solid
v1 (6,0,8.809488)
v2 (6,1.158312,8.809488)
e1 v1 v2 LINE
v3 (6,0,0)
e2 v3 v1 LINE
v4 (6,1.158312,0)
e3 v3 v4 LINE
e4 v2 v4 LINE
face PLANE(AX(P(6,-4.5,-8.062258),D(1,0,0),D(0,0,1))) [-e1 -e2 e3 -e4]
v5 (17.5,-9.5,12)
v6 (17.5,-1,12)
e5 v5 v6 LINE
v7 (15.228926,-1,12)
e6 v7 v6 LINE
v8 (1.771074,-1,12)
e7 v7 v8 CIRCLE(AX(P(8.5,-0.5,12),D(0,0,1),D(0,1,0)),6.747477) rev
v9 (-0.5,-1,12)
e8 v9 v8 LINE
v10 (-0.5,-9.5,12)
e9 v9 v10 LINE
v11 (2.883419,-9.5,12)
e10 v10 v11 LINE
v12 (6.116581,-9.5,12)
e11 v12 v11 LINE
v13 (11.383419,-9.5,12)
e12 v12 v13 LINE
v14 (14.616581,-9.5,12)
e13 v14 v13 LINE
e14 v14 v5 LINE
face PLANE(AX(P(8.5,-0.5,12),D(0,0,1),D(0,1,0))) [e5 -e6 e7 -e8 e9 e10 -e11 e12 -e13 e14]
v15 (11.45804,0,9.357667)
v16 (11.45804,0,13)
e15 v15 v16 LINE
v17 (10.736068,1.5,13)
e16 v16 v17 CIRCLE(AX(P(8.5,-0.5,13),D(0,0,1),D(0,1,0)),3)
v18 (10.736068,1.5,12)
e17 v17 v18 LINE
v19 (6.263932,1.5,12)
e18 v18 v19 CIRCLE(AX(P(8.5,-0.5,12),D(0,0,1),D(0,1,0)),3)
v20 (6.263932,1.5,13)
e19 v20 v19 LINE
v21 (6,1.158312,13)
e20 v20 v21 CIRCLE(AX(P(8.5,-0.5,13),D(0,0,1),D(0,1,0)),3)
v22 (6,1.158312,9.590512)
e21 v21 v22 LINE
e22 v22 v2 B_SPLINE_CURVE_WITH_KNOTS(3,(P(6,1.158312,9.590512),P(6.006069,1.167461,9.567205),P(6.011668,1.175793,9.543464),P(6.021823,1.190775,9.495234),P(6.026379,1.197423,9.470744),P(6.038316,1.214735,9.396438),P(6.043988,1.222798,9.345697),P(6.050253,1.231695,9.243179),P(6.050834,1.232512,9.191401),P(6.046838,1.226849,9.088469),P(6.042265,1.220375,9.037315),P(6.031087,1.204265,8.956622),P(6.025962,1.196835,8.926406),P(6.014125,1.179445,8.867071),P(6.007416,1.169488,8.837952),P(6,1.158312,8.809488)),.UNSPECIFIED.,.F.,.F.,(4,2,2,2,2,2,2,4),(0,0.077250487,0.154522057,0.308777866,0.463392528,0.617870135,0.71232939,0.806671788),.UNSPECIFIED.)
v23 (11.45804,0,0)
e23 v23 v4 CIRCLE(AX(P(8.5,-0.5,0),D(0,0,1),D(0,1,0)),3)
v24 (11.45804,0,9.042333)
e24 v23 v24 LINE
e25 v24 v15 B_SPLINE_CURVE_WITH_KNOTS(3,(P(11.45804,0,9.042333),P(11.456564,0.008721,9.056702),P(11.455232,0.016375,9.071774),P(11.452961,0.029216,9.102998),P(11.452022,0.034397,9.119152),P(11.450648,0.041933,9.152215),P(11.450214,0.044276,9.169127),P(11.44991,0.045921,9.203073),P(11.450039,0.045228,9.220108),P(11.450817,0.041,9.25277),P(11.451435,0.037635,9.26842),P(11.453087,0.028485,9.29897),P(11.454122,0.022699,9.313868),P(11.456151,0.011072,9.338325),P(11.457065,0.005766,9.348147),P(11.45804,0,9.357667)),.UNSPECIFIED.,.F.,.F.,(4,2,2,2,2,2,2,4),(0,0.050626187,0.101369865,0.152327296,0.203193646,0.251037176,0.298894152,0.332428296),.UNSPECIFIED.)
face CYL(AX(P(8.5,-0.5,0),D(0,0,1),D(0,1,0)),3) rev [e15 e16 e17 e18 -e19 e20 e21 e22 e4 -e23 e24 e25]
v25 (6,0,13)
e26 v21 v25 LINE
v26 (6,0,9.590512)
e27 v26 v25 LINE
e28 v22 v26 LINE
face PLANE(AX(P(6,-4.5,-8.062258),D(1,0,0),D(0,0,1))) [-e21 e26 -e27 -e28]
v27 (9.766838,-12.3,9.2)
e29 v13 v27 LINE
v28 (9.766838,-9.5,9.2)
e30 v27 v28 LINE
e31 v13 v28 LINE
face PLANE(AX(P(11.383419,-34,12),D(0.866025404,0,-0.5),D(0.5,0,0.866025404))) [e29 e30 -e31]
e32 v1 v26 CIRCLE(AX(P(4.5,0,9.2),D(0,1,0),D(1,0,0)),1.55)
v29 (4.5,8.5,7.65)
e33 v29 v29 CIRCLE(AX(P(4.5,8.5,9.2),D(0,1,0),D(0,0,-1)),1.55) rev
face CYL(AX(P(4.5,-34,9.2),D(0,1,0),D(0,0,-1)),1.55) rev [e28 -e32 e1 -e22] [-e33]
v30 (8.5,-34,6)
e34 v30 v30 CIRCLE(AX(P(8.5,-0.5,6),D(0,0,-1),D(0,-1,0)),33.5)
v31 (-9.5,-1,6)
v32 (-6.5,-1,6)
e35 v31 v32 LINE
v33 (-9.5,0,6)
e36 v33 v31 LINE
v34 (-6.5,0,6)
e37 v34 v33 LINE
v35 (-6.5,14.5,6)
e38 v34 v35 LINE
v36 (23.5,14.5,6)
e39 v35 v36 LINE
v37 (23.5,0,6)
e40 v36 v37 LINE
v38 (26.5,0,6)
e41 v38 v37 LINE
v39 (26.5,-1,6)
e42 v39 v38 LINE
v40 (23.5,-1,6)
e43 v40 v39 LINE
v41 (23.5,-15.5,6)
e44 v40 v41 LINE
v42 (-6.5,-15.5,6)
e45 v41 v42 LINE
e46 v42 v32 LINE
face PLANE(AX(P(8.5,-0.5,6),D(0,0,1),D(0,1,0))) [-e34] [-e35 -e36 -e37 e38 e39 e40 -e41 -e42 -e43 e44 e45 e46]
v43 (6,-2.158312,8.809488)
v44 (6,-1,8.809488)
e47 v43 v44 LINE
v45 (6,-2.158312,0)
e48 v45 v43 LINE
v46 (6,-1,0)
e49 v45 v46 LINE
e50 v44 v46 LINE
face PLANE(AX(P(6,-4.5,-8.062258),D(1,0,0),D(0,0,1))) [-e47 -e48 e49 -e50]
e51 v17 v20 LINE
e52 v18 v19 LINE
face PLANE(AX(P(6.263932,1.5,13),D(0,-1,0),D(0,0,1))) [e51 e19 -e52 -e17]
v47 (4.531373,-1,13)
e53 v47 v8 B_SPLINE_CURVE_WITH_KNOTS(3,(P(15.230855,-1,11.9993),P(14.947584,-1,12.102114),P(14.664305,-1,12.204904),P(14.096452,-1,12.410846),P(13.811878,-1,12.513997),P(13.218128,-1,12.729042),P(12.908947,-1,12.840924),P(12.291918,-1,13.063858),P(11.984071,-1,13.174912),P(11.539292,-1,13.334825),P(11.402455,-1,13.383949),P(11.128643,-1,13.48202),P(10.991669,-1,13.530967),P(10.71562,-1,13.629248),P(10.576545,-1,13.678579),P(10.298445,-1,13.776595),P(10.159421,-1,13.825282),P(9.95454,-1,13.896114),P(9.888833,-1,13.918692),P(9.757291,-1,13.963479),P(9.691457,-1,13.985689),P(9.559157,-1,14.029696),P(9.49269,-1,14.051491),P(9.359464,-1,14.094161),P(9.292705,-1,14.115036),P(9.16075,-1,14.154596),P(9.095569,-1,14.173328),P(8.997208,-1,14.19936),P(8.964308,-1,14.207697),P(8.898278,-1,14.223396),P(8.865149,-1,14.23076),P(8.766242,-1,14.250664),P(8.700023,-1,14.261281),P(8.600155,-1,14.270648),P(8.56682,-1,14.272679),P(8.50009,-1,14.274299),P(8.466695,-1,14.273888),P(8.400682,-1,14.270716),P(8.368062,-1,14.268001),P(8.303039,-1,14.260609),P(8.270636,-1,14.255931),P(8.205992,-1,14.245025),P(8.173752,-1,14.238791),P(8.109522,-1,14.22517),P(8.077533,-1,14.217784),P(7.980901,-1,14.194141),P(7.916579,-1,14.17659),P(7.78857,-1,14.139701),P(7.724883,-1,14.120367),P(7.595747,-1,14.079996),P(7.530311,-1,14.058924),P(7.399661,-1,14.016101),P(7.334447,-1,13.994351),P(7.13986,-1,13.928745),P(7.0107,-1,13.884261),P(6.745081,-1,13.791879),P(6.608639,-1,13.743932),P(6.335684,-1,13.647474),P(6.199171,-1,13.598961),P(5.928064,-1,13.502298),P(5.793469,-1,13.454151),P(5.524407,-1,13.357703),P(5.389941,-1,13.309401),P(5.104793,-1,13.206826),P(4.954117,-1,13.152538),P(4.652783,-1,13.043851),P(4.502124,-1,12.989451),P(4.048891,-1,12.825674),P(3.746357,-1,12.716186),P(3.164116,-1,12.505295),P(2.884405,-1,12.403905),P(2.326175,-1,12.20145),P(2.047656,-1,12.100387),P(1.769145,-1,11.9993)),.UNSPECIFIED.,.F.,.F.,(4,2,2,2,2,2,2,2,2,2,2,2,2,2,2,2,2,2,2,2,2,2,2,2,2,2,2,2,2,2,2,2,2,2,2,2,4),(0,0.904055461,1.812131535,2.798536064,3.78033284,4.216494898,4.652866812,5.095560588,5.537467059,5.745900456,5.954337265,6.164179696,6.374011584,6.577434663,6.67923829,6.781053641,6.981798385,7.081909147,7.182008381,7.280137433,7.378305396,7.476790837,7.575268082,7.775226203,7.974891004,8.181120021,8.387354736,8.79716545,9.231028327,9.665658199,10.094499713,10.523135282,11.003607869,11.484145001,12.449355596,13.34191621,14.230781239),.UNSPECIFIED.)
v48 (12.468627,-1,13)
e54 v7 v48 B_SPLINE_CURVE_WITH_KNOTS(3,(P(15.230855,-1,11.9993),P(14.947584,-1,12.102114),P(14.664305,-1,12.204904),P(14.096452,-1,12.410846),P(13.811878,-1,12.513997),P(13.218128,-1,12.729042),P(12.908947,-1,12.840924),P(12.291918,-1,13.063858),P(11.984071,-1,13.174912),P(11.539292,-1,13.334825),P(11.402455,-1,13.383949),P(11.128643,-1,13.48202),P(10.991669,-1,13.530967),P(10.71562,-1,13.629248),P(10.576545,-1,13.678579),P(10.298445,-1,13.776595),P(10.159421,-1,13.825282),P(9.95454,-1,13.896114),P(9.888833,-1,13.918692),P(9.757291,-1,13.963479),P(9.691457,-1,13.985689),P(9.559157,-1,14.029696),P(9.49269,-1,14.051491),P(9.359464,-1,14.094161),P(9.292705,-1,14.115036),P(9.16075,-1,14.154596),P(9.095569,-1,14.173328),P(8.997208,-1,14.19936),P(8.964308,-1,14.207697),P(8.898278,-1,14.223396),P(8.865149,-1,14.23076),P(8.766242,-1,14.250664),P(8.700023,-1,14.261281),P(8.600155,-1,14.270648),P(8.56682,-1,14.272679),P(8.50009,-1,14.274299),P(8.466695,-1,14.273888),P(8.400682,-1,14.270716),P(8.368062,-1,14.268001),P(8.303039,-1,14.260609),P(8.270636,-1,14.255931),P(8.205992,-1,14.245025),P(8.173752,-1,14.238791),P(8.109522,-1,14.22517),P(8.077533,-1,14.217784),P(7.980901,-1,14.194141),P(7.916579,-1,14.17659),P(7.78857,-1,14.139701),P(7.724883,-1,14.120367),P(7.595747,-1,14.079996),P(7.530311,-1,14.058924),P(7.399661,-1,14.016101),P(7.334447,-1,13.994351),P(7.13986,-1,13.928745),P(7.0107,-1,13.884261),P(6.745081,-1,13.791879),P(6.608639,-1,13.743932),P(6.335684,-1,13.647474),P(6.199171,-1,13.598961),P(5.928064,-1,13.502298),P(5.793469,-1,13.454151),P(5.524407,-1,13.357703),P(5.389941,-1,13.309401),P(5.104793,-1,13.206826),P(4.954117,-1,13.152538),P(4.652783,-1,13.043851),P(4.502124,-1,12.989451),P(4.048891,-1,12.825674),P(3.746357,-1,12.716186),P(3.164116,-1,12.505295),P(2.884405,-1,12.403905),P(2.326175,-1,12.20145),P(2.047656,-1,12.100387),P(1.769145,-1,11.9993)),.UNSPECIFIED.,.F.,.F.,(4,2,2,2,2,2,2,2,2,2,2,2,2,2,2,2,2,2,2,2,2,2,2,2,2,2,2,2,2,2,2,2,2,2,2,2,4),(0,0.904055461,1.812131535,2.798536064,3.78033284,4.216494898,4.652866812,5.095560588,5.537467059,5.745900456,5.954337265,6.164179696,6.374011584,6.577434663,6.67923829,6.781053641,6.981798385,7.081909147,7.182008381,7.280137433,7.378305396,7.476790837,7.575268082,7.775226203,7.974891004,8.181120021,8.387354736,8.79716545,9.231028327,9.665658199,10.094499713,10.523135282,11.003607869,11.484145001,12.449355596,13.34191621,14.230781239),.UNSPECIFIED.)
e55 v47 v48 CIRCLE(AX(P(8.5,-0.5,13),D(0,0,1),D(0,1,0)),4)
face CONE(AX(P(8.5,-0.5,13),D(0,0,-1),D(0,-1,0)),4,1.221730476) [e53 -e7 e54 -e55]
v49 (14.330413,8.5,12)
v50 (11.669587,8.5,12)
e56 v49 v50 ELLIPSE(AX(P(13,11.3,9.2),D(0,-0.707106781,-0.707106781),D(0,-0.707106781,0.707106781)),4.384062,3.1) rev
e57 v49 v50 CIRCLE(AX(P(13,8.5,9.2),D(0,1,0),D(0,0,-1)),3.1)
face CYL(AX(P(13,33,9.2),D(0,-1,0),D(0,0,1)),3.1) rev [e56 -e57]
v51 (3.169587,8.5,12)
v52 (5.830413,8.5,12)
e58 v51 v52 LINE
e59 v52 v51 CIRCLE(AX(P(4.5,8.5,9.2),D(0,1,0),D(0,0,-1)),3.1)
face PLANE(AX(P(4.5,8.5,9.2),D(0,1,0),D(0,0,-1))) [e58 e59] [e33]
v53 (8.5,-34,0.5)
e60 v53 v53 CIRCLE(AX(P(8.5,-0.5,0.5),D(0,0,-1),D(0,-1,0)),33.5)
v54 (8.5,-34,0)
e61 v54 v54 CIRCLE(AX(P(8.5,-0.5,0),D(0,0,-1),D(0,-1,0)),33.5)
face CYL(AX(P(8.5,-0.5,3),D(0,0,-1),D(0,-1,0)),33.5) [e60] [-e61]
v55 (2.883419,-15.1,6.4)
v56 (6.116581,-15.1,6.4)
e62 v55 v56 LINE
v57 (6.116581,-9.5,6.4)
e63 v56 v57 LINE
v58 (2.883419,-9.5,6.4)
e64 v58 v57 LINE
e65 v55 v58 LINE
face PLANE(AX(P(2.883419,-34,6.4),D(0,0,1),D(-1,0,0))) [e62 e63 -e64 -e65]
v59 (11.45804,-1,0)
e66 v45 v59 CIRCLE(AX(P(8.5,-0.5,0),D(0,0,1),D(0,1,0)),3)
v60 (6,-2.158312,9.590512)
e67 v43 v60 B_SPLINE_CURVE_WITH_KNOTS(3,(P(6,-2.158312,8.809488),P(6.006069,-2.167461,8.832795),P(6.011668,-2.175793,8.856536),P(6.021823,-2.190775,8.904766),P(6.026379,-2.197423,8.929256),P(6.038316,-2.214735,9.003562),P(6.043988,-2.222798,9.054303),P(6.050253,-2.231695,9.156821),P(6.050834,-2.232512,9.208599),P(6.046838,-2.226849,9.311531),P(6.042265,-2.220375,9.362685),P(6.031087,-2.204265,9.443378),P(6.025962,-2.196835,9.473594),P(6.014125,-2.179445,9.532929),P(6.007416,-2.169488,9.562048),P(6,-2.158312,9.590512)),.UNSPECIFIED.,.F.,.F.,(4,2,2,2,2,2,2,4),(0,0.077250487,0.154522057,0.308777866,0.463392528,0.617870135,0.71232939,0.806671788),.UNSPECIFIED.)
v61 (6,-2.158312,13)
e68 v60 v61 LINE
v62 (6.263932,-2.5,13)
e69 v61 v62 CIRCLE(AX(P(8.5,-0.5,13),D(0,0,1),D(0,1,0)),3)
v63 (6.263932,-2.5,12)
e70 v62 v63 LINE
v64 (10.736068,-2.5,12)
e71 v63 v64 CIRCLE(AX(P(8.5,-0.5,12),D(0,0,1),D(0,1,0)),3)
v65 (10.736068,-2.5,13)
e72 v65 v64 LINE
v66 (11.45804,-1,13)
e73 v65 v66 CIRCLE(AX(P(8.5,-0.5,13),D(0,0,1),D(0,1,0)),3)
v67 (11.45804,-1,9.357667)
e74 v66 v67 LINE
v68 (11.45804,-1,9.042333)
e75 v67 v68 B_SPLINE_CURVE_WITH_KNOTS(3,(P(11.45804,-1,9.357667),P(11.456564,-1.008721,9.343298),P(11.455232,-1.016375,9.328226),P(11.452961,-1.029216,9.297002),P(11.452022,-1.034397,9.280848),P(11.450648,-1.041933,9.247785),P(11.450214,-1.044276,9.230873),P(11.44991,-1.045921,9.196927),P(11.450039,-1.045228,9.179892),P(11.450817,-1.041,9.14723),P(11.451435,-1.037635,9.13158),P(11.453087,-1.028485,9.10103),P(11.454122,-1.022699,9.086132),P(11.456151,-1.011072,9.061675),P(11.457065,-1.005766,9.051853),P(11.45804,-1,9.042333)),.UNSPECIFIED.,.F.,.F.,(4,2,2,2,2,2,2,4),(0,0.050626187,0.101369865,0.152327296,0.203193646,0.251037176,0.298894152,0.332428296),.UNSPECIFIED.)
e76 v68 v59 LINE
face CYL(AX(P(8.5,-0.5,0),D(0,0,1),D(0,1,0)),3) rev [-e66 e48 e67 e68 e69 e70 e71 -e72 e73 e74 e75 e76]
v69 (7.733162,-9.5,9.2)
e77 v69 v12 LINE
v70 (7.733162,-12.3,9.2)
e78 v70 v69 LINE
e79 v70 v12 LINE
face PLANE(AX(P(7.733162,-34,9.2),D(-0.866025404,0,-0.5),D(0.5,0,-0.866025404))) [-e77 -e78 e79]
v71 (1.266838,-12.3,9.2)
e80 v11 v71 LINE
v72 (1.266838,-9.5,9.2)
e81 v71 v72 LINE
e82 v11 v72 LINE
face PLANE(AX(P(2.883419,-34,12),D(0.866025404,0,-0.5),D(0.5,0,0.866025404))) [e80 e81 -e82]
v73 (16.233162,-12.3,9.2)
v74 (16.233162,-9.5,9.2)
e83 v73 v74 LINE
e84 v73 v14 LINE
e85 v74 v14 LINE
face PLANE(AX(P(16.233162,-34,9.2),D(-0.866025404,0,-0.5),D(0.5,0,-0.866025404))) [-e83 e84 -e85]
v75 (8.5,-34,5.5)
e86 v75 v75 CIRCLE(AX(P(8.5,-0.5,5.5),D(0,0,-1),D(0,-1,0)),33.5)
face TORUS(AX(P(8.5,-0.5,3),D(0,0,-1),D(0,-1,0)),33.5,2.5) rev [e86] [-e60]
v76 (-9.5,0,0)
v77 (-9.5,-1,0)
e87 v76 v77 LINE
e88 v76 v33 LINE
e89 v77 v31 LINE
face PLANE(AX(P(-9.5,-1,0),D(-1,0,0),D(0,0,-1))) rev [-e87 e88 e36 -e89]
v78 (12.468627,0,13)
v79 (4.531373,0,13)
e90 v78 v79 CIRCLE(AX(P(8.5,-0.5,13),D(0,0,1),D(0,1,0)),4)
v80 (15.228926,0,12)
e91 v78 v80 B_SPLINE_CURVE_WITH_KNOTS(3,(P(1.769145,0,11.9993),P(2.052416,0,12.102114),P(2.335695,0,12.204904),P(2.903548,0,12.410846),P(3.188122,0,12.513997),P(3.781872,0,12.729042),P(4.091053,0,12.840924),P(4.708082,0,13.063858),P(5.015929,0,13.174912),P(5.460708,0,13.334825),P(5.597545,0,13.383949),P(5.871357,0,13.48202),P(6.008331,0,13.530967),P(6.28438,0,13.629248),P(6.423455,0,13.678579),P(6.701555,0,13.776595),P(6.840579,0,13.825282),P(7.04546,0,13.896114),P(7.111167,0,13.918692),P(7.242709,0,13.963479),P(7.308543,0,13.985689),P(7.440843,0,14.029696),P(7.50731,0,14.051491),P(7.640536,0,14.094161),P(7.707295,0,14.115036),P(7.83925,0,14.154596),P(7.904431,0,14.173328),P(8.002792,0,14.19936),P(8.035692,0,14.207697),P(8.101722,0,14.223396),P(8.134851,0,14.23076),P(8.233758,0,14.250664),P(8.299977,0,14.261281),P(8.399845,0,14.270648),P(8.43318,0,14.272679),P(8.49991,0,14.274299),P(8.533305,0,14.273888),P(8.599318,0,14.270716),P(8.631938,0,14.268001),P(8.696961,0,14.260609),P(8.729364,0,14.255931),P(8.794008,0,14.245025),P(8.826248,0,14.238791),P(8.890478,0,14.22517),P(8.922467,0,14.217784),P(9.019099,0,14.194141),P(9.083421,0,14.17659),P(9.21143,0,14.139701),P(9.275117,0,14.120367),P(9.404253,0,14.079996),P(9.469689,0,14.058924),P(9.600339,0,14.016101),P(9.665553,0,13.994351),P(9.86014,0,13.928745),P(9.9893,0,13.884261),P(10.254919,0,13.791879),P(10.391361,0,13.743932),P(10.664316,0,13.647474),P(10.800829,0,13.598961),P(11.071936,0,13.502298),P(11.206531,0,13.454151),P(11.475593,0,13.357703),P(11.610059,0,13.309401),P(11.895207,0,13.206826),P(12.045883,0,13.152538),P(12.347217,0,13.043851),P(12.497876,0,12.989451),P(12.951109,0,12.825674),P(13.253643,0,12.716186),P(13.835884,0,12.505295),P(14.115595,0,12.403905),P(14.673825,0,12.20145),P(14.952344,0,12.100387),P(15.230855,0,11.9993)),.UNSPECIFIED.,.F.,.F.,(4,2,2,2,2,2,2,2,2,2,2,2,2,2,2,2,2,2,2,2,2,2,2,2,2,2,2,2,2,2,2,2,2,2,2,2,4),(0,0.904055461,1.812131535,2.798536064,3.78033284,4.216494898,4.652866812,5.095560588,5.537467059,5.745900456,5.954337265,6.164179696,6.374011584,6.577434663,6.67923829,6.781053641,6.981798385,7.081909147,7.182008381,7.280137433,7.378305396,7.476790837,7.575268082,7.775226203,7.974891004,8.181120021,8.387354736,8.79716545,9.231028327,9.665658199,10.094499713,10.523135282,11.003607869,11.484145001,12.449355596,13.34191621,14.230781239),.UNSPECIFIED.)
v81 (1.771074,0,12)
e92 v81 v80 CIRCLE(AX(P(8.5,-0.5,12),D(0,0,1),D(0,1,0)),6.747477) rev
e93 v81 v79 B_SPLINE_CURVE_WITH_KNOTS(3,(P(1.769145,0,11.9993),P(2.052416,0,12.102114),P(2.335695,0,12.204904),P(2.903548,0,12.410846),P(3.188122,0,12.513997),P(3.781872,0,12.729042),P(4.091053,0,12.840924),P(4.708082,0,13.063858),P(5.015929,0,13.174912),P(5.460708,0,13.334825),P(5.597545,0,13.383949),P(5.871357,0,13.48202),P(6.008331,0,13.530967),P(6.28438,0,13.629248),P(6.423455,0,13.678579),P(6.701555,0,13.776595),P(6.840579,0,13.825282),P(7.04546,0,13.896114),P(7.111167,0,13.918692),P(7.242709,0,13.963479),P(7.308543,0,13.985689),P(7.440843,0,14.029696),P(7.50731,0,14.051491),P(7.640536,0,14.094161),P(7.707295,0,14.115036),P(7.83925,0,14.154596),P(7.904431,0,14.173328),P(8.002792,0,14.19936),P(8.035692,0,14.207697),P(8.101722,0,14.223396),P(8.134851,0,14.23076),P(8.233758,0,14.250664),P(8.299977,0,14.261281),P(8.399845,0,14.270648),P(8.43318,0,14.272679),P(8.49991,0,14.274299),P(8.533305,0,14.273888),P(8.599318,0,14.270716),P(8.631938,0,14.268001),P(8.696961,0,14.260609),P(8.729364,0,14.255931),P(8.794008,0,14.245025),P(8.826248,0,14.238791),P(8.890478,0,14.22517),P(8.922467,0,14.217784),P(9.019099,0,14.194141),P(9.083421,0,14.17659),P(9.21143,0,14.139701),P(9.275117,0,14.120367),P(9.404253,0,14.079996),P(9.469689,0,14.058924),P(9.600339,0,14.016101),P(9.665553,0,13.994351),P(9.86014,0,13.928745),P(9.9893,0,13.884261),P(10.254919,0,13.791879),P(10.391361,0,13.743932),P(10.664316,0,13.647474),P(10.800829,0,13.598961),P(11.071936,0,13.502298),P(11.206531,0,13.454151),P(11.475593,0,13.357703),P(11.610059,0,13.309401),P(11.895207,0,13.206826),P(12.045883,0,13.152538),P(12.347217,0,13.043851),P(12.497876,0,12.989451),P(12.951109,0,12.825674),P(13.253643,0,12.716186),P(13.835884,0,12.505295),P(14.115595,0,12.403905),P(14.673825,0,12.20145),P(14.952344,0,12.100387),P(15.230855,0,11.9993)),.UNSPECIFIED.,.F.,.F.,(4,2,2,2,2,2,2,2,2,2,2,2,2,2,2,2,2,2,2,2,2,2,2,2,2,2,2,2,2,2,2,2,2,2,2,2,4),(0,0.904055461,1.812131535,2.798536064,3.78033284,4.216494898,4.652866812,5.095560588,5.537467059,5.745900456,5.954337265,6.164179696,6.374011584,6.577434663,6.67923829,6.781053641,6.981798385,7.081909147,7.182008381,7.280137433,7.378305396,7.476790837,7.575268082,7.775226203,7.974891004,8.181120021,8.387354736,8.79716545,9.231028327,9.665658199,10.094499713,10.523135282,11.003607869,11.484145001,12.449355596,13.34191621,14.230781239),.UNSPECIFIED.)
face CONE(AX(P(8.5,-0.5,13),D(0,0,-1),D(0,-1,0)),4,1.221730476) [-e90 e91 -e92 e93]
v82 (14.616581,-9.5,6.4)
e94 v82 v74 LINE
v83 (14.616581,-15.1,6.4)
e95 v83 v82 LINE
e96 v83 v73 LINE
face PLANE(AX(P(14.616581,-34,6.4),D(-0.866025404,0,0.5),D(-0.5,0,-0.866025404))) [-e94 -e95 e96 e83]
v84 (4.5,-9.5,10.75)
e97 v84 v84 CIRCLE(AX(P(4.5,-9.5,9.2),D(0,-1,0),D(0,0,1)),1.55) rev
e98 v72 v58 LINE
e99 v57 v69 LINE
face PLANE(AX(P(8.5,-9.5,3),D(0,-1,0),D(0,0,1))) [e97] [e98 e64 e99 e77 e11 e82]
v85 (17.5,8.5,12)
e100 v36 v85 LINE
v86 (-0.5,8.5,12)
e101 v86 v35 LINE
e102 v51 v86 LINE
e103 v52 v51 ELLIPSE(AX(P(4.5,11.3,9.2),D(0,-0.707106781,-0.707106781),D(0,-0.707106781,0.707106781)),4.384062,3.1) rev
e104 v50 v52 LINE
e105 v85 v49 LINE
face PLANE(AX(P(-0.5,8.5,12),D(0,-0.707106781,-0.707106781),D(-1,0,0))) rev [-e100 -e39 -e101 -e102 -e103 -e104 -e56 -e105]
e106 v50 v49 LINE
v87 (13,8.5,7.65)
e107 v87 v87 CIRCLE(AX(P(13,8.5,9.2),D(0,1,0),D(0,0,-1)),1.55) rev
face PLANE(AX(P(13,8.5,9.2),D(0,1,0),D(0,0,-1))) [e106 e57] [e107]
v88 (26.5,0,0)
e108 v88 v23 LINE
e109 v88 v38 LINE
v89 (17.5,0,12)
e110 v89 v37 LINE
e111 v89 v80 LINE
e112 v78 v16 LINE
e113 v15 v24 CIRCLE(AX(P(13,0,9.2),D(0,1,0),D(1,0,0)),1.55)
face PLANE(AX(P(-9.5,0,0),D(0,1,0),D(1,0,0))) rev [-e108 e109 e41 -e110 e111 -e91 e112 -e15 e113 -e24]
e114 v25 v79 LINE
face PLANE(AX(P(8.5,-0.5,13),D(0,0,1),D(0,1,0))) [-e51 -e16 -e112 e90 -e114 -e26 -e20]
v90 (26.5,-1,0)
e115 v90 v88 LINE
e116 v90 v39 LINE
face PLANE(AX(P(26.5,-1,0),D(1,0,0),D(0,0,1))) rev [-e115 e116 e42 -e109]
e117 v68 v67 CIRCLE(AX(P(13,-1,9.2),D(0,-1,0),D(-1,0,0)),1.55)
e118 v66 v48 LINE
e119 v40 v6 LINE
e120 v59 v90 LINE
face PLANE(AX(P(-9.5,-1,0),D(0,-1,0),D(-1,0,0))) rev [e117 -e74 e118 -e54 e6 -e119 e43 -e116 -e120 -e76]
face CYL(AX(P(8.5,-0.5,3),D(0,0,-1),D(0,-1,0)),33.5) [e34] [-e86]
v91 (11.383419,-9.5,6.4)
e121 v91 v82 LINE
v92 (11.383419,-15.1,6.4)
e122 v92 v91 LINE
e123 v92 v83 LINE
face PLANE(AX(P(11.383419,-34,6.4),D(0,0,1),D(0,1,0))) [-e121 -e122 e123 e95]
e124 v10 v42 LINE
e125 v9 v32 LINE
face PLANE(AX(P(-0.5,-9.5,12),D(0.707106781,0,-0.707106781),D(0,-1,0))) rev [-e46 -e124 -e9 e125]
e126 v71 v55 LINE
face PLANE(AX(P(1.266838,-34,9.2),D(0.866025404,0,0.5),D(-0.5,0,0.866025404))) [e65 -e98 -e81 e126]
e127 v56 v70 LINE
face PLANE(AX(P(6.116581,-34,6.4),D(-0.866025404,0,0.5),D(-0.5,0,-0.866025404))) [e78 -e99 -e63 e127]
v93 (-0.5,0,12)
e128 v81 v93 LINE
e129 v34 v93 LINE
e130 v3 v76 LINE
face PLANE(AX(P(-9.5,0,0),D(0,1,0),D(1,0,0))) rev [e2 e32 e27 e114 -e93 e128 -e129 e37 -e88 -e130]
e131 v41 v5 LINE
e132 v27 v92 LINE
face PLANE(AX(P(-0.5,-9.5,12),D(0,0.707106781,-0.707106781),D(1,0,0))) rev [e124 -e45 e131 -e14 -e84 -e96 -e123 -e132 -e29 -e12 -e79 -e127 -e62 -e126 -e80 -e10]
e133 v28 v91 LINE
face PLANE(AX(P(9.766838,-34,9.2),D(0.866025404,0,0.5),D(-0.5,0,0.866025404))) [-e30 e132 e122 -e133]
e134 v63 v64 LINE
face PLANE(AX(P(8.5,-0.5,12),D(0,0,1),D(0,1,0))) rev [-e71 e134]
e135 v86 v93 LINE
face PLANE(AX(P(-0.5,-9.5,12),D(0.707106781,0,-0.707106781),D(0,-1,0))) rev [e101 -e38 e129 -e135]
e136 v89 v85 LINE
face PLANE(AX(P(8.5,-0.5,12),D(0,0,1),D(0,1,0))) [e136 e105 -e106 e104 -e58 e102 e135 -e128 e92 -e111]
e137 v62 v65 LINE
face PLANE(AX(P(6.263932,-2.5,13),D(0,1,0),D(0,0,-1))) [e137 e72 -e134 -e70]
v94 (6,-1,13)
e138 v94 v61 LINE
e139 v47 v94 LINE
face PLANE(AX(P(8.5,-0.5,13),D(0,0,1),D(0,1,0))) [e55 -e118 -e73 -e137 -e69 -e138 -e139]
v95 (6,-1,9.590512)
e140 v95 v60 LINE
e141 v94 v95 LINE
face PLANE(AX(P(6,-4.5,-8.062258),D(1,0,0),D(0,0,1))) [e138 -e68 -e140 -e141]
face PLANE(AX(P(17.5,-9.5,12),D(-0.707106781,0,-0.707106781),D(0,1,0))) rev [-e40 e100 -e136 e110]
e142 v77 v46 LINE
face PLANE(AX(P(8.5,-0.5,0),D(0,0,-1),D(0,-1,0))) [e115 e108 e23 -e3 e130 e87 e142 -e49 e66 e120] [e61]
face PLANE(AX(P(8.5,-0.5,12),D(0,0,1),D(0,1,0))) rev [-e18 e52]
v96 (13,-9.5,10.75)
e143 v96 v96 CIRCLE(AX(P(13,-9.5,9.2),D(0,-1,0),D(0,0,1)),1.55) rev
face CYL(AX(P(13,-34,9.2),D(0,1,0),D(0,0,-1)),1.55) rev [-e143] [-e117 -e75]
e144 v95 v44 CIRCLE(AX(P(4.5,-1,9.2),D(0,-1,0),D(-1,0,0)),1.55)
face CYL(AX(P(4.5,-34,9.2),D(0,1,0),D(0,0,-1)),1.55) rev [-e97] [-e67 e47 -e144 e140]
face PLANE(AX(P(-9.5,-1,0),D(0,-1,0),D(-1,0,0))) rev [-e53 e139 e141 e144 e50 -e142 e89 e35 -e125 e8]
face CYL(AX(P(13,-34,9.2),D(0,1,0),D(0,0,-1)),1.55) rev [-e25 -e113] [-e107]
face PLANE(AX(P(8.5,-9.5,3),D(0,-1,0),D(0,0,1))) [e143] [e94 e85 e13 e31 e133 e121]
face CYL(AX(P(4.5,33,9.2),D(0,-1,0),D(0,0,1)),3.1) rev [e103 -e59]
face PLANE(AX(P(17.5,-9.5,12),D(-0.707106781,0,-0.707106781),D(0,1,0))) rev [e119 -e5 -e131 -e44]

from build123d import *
from build123d.topology import SkipClean

# Parameters (mm, degrees)
SKETCH3_R               = 3
CUT_EXTRUDE1_DEPTH      = 48.754580932
SKETCH4_W               = 8
SKETCH4_H               = 1
BOSS_EXTRUDE1_DEPTH     = 6
BOSS_EXTRUDE2_START     = 6
SKETCH5_W               = 18
SKETCH5_H               = 18
BOSS_EXTRUDE2_DEPTH     = 6
BOSS_EXTRUDE3_START     = 1
SKETCH13_R              = 4
BOSS_EXTRUDE3_DEPTH     = 1
CHAMFER1_SIZE           = 6
CHAMFER2_SIZE2          = 1
CHAMFER2_SIZE           = 2.747477419
CUT_EXTRUDE2_DEPTH      = 49.872282533
CUT_EXTRUDE2_DEPTH_BACK = 49.872282533
SKETCH6_W               = 1
SKETCH6_H               = 36
CUT_EXTRUDE5_DEPTH      = 49.420037175
CUT_EXTRUDE5_DEPTH_BACK = 49.420037175
SKETCH7_R               = 1.55
CUT_EXTRUDE6_START      = 9
CUT_EXTRUDE6_DEPTH      = 40.420037195
CUT_EXTRUDE7_START      = 9
SKETCH9_R               = 3.1
CUT_EXTRUDE7_DEPTH      = 40.420037195
SKETCH11_R              = 2.5
BODY_MOVE_COPY1_ANGLE   = 180


with BuildPart() as part:
    # Sketch2 → Revolve1 (revolve)
    with BuildSketch(Plane(origin=(0, 0, 0), x_dir=(1, 0, 0), z_dir=(0, 1, 0))):
        with BuildLine():
            Line((0, 0), (0, 3))
            Line((0, 3), (33.5, 3))
            Line((33.5, 3), (33.5, 2.5))
            ThreePointArc((33.5, 2.5), (31, 0), (33.5, -2.5))
            Line((33.5, -2.5), (33.5, -3))
            Line((33.5, -3), (0, -3))
            Line((0, -3), (0, 0))
        make_face()
    revolve(axis=Axis((0, 0, 0), (0, 0, -1)))

    # Sketch3 → Cut-Extrude1 (cut, through all)
    with BuildSketch(Plane(origin=(0, 0, -3), x_dir=(-1, 0, 0), z_dir=(0, 0, -1))):
        Circle(SKETCH3_R)
    extrude(amount=-CUT_EXTRUDE1_DEPTH, mode=Mode.SUBTRACT)

    # Sketch4 → Boss-Extrude1 (add)
    with BuildSketch(Plane(origin=(0, 0, -3), x_dir=(-1, 0, 0), z_dir=(0, 0, -1))):
        with Locations((0, 3)):
            Rectangle(SKETCH4_W, SKETCH4_H)
    extrude(amount=-BOSS_EXTRUDE1_DEPTH)

    # Sketch5 → Boss-Extrude2 (add)
    with BuildSketch(Plane(origin=(0, 0, -3), x_dir=(-1, 0, 0), z_dir=(0, 0, -1)).offset(BOSS_EXTRUDE2_START)):
        Rectangle(SKETCH5_W, SKETCH5_H)
        with BuildLine():
            Line((-1.658312395, 2.5), (1.658312395, 2.5))
            ThreePointArc((1.658312395, 2.5), (0, -3), (-1.658312395, 2.5))
        make_face(mode=Mode.SUBTRACT)
    extrude(amount=-BOSS_EXTRUDE2_DEPTH)

    # Sketch13 → Boss-Extrude3 (add)
    with SkipClean():  # the faces are left unmerged after this step: merging them gives an invalid solid
        with BuildSketch(Plane(origin=(0, 0, -9), x_dir=(-1, 0, 0), z_dir=(0, 0, -1)).offset(BOSS_EXTRUDE3_START)):
            Circle(SKETCH13_R)
            with BuildLine():
                Line((1.658312395, 2.5), (-1.658312395, 2.5))
                ThreePointArc((-1.658312395, 2.5), (-1.833910419, 2.374188825), (-2, 2.236067977))
                Line((-2, 2.236067977), (-2, -2.236067977))
                ThreePointArc((-2, -2.236067977), (0, -3), (2, -2.236067977))
                Line((2, -2.236067977), (2, 2.236067977))
                ThreePointArc((2, 2.236067977), (1.833910419, 2.374188825), (1.658312395, 2.5))
            make_face(mode=Mode.SUBTRACT)
        extrude(amount=-BOSS_EXTRUDE3_DEPTH)

    # Chamfer1
    chamfer1_edges = [part.edges().sort_by_distance(p)[0] for p in [
        (0, -9, -3),
        (0, 9, -3),
        (9, 0, -3),
        (-9, 0, -3),
    ]]
    chamfer(chamfer1_edges, length=CHAMFER1_SIZE - 0.0001)  # a hair under: the kernel refuses the full size

    # Chamfer2
    chamfer2_edges = [part.edges().sort_by_distance(p)[0] for p in [
        (4, 0, -9),
    ]]
    chamfer2_side = [part.faces().sort_by_distance(p)[0] for p in [
        (4.02, 0, -9),
    ]]
    chamfer(chamfer2_edges, length=CHAMFER2_SIZE - 0.0001, length2=CHAMFER2_SIZE2 - 0.0001, reference=chamfer2_side[0])  # a hair under: the kernel refuses the full size

    # Sketch6 → Cut-Extrude2 (cut, two sides: drawn at the far end of the back side and taken through both)
    with BuildSketch(Plane(origin=(0, 0, -9), x_dir=(-1, 0, 0), z_dir=(0, 0, -1)).offset(-CUT_EXTRUDE2_DEPTH_BACK)):
        Rectangle(SKETCH6_W, SKETCH6_H)
    extrude(amount=CUT_EXTRUDE2_DEPTH + CUT_EXTRUDE2_DEPTH_BACK, mode=Mode.SUBTRACT)

    # Sketch7 → Cut-Extrude5 (cut, two sides: drawn at the far end of the back side and taken through both)
    with BuildSketch(Plane.ZY.offset(-CUT_EXTRUDE5_DEPTH_BACK)):
        with Locations((-6.2, 4)):
            Circle(SKETCH7_R)
        with Locations(Location((-6.2, -4.5, 0), (0, 0, 84.161721877))):
            Circle(SKETCH7_R)
    extrude(amount=CUT_EXTRUDE5_DEPTH + CUT_EXTRUDE5_DEPTH_BACK, mode=Mode.SUBTRACT)

    # Sketch8 → Cut-Extrude6 (cut, through all)
    with BuildSketch(Plane(origin=(0, 0, 0), x_dir=(0, 0, -1), z_dir=(1, 0, 0)).offset(CUT_EXTRUDE6_START)):
        Polygon((6.2, 7.233161507), (3.4, 5.616580754), (3.4, 2.383419246), (6.2, 0.766838493), (9, 2.383419246), (9, 5.616580754), align=None)
        Polygon((9, -2.883419246), (6.2, -1.266838493), (3.4, -2.883419246), (3.4, -6.116580754), (6.2, -7.733161507), (9, -6.116580754), align=None)
    extrude(amount=CUT_EXTRUDE6_DEPTH, mode=Mode.SUBTRACT)

    # Sketch9 → Cut-Extrude7 (cut, through all)
    with BuildSketch(Plane.ZY.offset(CUT_EXTRUDE7_START)):
        with Locations((-6.2, 4)):
            Circle(SKETCH9_R)
        with Locations((-6.2, -4.5)):
            Circle(SKETCH9_R)
    extrude(amount=CUT_EXTRUDE7_DEPTH, mode=Mode.SUBTRACT)


with BuildPart() as body_2:
    # Sketch11 → Revolve2 (revolve)
    with BuildSketch(Plane(origin=(0, 0, 0), x_dir=(1, 0, 0), z_dir=(0, 1, 0)), mode=Mode.PRIVATE) as revolve2_sk:
        with Locations((33.5, 0)):
            Circle(SKETCH11_R)
    revolve(revolve2_sk.sketch.rotate(Axis((0, 0, 0), (0, 0, 1)), 180), axis=Axis((0, 0, 0), (0, 0, 1)))


with BuildPart() as part_1:
    # Body-Move/Copy1: read off the stored shape, not the designer's step
    # Body-Move/Copy1: moved
    add(part.part.moved(Location((0.5, -8.5, -3))).rotate(Axis((0, 0, 0), (0.7071067812, -0.7071067812, 0)), BODY_MOVE_COPY1_ANGLE))


solid = part_1.part
